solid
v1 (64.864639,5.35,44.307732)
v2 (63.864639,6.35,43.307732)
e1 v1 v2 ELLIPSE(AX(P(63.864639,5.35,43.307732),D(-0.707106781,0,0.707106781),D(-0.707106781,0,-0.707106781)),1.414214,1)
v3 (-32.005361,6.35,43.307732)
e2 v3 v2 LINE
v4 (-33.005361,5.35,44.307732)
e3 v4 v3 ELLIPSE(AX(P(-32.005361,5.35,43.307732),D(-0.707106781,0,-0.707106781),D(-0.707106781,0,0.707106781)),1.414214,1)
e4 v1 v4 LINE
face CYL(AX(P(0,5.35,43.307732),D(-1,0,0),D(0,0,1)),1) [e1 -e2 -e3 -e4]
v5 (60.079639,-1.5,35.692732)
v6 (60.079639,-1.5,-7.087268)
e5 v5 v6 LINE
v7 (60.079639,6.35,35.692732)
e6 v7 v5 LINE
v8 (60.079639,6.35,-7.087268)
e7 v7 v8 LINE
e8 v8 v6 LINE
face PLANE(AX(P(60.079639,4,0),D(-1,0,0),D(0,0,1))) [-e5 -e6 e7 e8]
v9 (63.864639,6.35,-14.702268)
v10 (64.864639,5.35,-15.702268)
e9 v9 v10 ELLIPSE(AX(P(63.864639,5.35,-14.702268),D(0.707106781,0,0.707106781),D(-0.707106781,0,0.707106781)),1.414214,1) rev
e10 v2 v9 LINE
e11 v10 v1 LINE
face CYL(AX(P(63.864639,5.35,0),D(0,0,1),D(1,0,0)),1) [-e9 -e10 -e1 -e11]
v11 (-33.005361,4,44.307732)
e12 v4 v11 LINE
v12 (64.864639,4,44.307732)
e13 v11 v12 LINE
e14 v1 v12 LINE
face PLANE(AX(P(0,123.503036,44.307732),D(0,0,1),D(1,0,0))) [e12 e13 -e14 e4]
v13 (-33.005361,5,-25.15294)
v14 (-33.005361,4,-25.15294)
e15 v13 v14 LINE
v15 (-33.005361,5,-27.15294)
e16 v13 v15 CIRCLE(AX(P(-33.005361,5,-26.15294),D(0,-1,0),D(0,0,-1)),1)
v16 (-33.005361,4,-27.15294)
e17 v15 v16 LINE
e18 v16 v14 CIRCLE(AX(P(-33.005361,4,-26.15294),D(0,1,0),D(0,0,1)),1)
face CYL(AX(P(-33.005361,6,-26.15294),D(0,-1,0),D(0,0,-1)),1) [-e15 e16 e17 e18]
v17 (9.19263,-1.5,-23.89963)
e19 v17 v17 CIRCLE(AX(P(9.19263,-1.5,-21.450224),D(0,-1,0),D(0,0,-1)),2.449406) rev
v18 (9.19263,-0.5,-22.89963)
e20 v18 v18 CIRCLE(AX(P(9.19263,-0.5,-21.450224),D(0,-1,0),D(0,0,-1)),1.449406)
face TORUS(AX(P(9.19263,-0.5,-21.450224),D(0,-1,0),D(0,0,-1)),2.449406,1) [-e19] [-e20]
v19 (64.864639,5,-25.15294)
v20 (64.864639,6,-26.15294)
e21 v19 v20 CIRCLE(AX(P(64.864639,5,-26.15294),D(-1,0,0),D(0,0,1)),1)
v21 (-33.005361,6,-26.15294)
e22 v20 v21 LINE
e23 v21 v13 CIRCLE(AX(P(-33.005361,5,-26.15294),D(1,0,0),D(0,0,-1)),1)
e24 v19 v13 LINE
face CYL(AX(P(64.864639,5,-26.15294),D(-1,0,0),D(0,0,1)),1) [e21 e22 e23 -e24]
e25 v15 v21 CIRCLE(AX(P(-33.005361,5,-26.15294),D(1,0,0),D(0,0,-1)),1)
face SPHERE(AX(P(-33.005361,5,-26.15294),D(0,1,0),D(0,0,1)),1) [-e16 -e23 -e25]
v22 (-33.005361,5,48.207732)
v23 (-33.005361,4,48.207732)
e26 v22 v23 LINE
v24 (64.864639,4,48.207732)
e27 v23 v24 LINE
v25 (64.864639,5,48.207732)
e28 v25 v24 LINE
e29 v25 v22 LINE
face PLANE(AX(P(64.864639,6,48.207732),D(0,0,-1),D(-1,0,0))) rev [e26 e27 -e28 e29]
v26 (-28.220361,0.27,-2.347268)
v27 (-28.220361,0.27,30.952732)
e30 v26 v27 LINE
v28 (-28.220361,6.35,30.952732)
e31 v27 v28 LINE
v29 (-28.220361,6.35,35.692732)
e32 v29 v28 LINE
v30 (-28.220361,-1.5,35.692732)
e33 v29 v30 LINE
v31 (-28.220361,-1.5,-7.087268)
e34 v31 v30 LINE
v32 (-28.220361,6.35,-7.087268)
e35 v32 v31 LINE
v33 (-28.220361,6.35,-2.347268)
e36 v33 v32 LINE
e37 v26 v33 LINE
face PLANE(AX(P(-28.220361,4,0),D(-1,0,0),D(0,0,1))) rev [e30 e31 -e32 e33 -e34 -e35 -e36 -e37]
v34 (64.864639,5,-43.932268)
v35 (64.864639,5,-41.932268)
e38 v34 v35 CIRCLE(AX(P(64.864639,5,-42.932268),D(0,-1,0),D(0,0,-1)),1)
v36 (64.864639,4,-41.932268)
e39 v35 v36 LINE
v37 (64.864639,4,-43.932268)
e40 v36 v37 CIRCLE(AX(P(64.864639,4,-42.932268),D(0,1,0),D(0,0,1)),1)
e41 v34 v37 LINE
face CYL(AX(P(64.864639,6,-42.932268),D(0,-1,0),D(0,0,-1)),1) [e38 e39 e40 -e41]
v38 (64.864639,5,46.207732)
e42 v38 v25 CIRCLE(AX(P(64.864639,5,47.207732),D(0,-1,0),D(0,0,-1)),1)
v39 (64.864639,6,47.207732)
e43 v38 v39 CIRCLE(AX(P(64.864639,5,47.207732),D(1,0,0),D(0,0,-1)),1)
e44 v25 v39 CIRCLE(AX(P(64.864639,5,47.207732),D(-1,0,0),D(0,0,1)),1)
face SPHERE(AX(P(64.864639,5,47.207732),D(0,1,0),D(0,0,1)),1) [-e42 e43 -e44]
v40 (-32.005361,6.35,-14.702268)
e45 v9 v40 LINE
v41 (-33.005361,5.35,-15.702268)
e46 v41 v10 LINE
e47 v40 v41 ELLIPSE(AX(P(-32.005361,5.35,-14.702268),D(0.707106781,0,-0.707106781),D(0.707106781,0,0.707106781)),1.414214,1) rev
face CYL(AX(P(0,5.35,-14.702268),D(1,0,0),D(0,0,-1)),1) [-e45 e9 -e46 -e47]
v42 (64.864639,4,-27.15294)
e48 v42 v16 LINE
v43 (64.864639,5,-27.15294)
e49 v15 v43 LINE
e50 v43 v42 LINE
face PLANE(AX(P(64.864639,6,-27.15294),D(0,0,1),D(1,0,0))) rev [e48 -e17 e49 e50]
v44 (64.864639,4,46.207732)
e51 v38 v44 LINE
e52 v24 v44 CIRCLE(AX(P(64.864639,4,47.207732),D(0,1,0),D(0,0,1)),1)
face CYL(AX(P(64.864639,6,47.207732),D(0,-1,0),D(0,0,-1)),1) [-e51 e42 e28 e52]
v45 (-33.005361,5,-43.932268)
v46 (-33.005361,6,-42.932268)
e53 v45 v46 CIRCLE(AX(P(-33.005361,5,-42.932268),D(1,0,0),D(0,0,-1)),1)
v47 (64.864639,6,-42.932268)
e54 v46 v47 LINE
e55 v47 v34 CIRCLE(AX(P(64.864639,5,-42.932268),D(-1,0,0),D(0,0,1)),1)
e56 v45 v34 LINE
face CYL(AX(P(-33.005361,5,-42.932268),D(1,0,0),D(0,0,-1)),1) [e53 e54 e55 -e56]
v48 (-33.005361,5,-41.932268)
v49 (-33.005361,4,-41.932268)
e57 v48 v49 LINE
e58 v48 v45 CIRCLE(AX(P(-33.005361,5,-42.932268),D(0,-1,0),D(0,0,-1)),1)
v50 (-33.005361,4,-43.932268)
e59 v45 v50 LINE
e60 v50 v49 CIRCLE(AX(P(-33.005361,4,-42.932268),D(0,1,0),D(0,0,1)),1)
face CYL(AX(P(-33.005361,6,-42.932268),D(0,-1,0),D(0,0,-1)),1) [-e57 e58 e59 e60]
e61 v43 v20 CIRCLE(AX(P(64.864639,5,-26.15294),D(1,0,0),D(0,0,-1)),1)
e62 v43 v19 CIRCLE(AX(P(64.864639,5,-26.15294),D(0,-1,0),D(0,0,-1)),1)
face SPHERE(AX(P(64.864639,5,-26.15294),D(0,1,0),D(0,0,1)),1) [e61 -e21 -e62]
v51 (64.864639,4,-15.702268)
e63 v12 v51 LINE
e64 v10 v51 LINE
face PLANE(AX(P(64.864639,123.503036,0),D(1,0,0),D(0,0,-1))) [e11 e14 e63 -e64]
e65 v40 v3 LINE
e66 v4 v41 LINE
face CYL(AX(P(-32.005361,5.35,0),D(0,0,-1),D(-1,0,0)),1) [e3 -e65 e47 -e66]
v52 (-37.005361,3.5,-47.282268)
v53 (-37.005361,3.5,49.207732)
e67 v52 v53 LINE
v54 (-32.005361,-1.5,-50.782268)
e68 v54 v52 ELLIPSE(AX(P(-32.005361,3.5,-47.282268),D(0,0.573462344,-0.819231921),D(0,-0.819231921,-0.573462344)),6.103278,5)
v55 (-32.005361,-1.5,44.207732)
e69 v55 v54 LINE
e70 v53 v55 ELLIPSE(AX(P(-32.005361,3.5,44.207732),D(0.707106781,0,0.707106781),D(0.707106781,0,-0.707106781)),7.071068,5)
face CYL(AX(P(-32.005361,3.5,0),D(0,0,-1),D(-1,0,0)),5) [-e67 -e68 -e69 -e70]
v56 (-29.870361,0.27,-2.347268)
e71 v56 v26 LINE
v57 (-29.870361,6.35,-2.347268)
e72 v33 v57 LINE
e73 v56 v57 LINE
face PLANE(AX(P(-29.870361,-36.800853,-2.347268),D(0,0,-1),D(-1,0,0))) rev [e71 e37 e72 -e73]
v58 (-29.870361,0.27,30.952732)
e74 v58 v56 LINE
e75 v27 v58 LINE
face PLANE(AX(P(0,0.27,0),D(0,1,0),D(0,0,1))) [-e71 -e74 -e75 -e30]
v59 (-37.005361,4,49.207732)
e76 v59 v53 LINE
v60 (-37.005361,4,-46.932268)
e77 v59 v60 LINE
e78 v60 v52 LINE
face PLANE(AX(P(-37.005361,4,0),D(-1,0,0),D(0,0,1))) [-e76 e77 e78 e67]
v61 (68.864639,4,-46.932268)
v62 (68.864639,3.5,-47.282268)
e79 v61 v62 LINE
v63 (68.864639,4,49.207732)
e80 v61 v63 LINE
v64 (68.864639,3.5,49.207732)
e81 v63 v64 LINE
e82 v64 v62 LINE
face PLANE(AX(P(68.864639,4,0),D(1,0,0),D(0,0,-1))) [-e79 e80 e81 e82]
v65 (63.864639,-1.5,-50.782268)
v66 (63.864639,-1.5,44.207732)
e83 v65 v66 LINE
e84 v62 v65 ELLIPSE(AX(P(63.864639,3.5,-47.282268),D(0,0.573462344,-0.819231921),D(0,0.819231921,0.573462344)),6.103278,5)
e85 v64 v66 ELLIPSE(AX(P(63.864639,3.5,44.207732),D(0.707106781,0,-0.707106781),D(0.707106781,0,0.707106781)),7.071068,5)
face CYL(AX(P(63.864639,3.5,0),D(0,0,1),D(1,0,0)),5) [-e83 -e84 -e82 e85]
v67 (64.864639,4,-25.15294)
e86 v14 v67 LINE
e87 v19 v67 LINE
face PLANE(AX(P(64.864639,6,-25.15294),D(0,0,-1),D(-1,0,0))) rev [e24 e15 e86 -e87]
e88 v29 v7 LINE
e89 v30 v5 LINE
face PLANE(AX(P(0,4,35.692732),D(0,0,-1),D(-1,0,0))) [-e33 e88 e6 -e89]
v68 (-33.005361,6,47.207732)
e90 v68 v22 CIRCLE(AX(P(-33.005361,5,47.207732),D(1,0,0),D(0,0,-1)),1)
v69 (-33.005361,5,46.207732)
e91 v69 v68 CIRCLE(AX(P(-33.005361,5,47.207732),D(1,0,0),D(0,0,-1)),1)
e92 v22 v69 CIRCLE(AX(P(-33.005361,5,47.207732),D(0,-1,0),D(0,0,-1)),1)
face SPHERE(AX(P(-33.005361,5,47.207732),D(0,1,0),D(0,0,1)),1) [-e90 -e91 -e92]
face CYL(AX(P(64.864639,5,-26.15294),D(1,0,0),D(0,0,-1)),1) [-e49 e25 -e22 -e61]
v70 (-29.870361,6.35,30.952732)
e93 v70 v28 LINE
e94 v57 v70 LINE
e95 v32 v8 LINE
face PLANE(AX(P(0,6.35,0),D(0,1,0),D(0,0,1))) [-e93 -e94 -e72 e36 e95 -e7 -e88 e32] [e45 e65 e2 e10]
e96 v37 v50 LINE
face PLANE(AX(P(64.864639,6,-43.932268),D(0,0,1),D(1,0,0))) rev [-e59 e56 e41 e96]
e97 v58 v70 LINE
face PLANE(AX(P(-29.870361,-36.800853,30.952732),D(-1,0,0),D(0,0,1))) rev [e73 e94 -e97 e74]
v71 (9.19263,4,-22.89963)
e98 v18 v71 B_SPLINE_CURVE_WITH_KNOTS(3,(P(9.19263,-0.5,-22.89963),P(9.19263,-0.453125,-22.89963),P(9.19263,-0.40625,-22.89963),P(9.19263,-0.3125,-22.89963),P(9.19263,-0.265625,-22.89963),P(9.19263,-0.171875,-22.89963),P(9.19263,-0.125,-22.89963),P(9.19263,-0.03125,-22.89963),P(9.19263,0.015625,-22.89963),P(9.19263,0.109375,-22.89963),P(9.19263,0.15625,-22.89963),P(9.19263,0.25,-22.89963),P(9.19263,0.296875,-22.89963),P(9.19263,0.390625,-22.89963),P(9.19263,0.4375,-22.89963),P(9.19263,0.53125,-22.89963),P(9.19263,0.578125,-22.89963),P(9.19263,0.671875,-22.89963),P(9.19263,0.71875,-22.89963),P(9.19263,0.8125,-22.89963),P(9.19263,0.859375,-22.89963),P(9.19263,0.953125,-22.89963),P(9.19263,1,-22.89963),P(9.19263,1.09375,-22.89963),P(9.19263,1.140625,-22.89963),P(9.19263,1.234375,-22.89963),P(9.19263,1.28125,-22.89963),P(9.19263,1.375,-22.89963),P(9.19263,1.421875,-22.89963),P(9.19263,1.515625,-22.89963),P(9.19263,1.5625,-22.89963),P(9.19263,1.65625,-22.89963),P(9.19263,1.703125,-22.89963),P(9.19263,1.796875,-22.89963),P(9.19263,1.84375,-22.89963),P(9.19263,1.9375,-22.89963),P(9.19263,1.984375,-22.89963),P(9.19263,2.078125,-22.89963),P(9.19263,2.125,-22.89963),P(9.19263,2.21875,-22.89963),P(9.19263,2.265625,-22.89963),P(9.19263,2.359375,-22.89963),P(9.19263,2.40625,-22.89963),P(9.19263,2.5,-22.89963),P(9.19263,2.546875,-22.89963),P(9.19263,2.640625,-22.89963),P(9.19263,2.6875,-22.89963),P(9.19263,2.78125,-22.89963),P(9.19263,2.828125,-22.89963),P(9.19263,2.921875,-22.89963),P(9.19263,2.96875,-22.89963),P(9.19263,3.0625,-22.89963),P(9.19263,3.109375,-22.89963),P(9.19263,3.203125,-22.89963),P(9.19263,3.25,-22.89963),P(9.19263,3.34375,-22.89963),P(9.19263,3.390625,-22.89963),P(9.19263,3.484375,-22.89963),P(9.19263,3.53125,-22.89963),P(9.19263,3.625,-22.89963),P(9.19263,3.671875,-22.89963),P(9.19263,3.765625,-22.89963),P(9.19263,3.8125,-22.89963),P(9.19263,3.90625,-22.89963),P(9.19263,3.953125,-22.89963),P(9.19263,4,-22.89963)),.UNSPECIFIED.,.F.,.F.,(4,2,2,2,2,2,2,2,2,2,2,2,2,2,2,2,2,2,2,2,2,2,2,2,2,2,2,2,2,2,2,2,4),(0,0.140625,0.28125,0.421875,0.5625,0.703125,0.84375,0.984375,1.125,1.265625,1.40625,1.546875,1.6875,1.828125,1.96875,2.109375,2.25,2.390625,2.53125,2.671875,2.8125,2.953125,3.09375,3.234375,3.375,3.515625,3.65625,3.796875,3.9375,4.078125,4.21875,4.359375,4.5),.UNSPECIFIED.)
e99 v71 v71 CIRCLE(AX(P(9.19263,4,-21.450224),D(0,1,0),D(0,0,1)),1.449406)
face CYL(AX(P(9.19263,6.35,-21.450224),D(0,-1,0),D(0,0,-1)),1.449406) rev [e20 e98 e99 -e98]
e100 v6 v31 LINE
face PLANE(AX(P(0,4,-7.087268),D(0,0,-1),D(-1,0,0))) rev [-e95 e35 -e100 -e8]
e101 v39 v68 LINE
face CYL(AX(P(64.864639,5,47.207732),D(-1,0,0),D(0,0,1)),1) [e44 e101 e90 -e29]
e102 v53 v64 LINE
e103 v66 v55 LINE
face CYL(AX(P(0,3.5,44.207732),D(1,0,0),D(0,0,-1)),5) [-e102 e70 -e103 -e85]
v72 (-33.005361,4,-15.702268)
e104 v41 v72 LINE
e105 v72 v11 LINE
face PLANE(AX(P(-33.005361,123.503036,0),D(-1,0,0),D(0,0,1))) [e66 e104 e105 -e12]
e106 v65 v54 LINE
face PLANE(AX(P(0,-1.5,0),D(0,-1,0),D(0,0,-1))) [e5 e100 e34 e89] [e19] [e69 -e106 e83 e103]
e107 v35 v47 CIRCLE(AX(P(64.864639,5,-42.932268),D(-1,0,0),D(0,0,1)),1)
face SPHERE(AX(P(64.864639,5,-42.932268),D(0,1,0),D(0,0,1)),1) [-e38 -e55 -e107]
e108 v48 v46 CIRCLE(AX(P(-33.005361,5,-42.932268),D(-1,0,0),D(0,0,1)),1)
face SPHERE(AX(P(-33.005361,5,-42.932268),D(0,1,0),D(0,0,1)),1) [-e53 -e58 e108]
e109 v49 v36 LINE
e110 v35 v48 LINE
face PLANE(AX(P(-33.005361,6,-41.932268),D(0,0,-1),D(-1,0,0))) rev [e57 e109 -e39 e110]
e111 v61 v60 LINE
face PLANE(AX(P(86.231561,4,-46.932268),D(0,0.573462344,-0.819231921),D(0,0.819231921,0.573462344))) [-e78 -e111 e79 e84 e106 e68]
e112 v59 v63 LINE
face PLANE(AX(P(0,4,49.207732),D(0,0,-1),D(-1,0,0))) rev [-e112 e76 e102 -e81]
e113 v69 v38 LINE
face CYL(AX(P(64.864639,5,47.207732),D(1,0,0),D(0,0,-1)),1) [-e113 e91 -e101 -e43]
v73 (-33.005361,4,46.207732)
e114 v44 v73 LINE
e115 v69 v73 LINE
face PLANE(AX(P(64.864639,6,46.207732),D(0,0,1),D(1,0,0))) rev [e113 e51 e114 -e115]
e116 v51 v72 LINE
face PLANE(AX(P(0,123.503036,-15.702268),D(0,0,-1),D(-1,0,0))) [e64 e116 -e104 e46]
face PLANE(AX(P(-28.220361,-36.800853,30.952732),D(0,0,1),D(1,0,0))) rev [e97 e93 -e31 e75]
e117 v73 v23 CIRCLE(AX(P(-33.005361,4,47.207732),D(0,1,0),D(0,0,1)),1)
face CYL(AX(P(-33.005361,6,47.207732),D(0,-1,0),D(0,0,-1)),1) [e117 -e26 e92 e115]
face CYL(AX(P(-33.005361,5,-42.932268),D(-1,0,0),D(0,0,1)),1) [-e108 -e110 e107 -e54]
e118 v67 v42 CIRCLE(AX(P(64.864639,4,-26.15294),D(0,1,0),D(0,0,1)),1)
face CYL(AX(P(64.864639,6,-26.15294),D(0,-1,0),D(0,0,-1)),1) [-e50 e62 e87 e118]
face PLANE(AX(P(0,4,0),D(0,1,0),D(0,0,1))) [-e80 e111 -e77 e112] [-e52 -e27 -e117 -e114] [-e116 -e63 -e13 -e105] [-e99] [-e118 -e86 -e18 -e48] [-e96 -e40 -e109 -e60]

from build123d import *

# Parameters (mm, degrees)
SKETCH1_W           = 105.87
SKETCH1_H           = 82.04
SKETCH1_W_2         = 88.3
SKETCH1_H_2         = 42.78
BOSS_EXTRUDE1_DEPTH = 4
SKETCH1_4_W         = 97.87
SKETCH1_4_H         = 60.01
SKETCH1_4_W_2       = 88.3
SKETCH1_4_H_2       = 42.78
BOSS_EXTRUDE2_DEPTH = 6.35
SKETCH2_R           = 1.449406475
CUT_EXTRUDE1_DEPTH  = 85.876744687
BOSS_EXTRUDE3_DEPTH = 105.87
FILLET6_R           = 1
BOSS_EXTRUDE4_DEPTH = 2
FILLET7_R           = 1
SKETCH5_W           = 1.65
SKETCH5_H           = 33.3
CUT_EXTRUDE3_DEPTH  = 6.08
BOSS_EXTRUDE6_START = 1.5
SKETCH10_W          = 105.87
SKETCH10_H          = 92.304593272
SKETCH10_R          = 1.449406475
SKETCH10_W_2        = 88.3
SKETCH10_H_2        = 42.78
BOSS_EXTRUDE6_DEPTH = 1.5
BOSS_EXTRUDE7_DEPTH = 105.87
FILLET9_R           = 1
FILLET10_R          = 5


with BuildPart() as part:
    # Sketch1 → Boss-Extrude1 (new body)
    with BuildSketch(Plane(origin=(0, 0, 0), x_dir=(1, 0, 0), z_dir=(0, 1, 0))):
        with Locations((15.929638567, -8.187731543)):
            Rectangle(SKETCH1_W, SKETCH1_H)
        with Locations((15.929638567, -14.302731543)):
            Rectangle(SKETCH1_W_2, SKETCH1_H_2, mode=Mode.SUBTRACT)
    extrude(amount=BOSS_EXTRUDE1_DEPTH)

    # Sketch1<4> → Boss-Extrude2 (add)
    with BuildSketch(Plane(origin=(0, 0, 0), x_dir=(1, 0, 0), z_dir=(0, 1, 0))):
        with Locations((15.929638567, -14.302731543)):
            Rectangle(SKETCH1_4_W, SKETCH1_4_H)
        with Locations((15.929638567, -14.302731543)):
            Rectangle(SKETCH1_4_W_2, SKETCH1_4_H_2, mode=Mode.SUBTRACT)
    extrude(amount=BOSS_EXTRUDE2_DEPTH)

    # Sketch2 → Cut-Extrude1 (cut, through all)
    with BuildSketch(Plane.XZ):
        with Locations(Location((9.192630415, -21.45022355, 0), (0, 0, 270))):
            Circle(SKETCH2_R)
    extrude(amount=-CUT_EXTRUDE1_DEPTH, mode=Mode.SUBTRACT)

    # Sketch3 → Boss-Extrude3 (add)
    with BuildSketch(Plane.ZY.offset(37.005361433)):
        Polygon((-32.832268457, 0), (-49.732268457, 0), (-46.932268457, 4), (-32.832268457, 4), align=None)
    extrude(amount=-BOSS_EXTRUDE3_DEPTH)

    # Fillet6
    fillet6_edges = [part.edges().sort_by_distance(p)[0] for p in [
        (-33.005361433, 6.35, 14.302731543),
        (15.929638567, 6.35, 44.307731543),
        (64.864638567, 6.35, 14.302731543),
        (15.929638567, 6.35, -15.702268457),
    ]]
    fillet(fillet6_edges, radius=FILLET6_R)

    # Sketch4 → Boss-Extrude4 (add)
    with BuildSketch(Plane(origin=(0, 4, 0), x_dir=(1, 0, 0), z_dir=(0, 1, 0))):
        with BuildLine():
            Line((64.864638567, 25.152939827), (-33.005361433, 25.152939827))
            ThreePointArc((-33.005361433, 25.152939827), (-34.005361433, 26.152939827), (-33.005361433, 27.152939827))
            Line((-33.005361433, 27.152939827), (64.864638567, 27.152939827))
            ThreePointArc((64.864638567, 27.152939827), (65.864638567, 26.152939827), (64.864638567, 25.152939827))
        make_face()
        with BuildLine():
            Line((-33.005361433, 41.932268457), (64.864638567, 41.932268457))
            ThreePointArc((64.864638567, 41.932268457), (65.864638567, 42.932268457), (64.864638567, 43.932268457))
            Line((64.864638567, 43.932268457), (-33.005361433, 43.932268457))
            ThreePointArc((-33.005361433, 43.932268457), (-34.005361433, 42.932268457), (-33.005361433, 41.932268457))
        make_face()
        with BuildLine():
            Line((64.864638567, -48.207731543), (-33.005361433, -48.207731543))
            ThreePointArc((-33.005361433, -48.207731543), (-34.005361433, -47.207731543), (-33.005361433, -46.207731543))
            Line((-33.005361433, -46.207731543), (64.864638567, -46.207731543))
            ThreePointArc((64.864638567, -46.207731543), (65.864638567, -47.207731543), (64.864638567, -48.207731543))
        make_face()
    extrude(amount=BOSS_EXTRUDE4_DEPTH)

    # Fillet7
    fillet7_edges = [part.edges().sort_by_distance(p)[0] for p in [
        (65.864638567, 6, 47.207731543),
        (15.929638567, 6, 46.207731543),
        (-34.005361433, 6, 47.207731543),
        (15.929638567, 6, 48.207731543),
        (-34.005361433, 6, -42.932268457),
        (15.929638567, 6, -41.932268457),
        (65.864638567, 6, -42.932268457),
        (15.929638567, 6, -43.932268457),
        (65.864638567, 6, -26.152939827),
        (15.929638567, 6, -27.152939827),
        (-34.005361433, 6, -26.152939827),
        (15.929638567, 6, -25.152939827),
    ]]
    fillet(fillet7_edges, radius=FILLET7_R - 0.0001)  # a hair under: the kernel refuses the full size

    # Sketch5 → Cut-Extrude3 (cut)
    with BuildSketch(Plane(origin=(0, 6.35, 0), x_dir=(1, 0, 0), z_dir=(0, 1, 0))):
        with Locations((-29.045361433, -14.302731543)):
            Rectangle(SKETCH5_W, SKETCH5_H)
    extrude(amount=-CUT_EXTRUDE3_DEPTH, mode=Mode.SUBTRACT)

    # Sketch10 → Boss-Extrude6 (add)
    with BuildSketch(Plane.XZ.offset(BOSS_EXTRUDE6_START)):
        with Locations((15.929638567, 3.055434907)):
            Rectangle(SKETCH10_W, SKETCH10_H)
        with Locations(Location((9.192630415, -21.45022355, 0), (0, 0, 270))):
            Circle(SKETCH10_R, mode=Mode.SUBTRACT)
        with Locations((15.929638567, 14.302731543)):
            Rectangle(SKETCH10_W_2, SKETCH10_H_2, mode=Mode.SUBTRACT)
    extrude(amount=-BOSS_EXTRUDE6_DEPTH)

    # Sketch11 → Boss-Extrude7 (add)
    with BuildSketch(Plane.ZY.offset(37.005361433)):
        Polygon((-49.732268457, 0), (-50.782268457, -1.5), (-43.096861729, -1.5), (-43.096861729, 0), align=None)
    extrude(amount=-BOSS_EXTRUDE7_DEPTH)

    # Fillet9
    fillet9_edges = [part.edges().sort_by_distance(p)[0] for p in [
        (9.192630415, -1.5, -20.000817075),
    ]]
    fillet(fillet9_edges, radius=FILLET9_R)

    # Fillet10
    fillet10_edges = [part.edges().sort_by_distance(p)[0] for p in [
        (-37.005361433, -1.5, -0.787268457),
        (68.864638567, -1.5, -0.787268457),
        (15.929638567, -1.5, 49.207731543),
    ]]
    fillet(fillet10_edges, radius=FILLET10_R)


solid = part.part
